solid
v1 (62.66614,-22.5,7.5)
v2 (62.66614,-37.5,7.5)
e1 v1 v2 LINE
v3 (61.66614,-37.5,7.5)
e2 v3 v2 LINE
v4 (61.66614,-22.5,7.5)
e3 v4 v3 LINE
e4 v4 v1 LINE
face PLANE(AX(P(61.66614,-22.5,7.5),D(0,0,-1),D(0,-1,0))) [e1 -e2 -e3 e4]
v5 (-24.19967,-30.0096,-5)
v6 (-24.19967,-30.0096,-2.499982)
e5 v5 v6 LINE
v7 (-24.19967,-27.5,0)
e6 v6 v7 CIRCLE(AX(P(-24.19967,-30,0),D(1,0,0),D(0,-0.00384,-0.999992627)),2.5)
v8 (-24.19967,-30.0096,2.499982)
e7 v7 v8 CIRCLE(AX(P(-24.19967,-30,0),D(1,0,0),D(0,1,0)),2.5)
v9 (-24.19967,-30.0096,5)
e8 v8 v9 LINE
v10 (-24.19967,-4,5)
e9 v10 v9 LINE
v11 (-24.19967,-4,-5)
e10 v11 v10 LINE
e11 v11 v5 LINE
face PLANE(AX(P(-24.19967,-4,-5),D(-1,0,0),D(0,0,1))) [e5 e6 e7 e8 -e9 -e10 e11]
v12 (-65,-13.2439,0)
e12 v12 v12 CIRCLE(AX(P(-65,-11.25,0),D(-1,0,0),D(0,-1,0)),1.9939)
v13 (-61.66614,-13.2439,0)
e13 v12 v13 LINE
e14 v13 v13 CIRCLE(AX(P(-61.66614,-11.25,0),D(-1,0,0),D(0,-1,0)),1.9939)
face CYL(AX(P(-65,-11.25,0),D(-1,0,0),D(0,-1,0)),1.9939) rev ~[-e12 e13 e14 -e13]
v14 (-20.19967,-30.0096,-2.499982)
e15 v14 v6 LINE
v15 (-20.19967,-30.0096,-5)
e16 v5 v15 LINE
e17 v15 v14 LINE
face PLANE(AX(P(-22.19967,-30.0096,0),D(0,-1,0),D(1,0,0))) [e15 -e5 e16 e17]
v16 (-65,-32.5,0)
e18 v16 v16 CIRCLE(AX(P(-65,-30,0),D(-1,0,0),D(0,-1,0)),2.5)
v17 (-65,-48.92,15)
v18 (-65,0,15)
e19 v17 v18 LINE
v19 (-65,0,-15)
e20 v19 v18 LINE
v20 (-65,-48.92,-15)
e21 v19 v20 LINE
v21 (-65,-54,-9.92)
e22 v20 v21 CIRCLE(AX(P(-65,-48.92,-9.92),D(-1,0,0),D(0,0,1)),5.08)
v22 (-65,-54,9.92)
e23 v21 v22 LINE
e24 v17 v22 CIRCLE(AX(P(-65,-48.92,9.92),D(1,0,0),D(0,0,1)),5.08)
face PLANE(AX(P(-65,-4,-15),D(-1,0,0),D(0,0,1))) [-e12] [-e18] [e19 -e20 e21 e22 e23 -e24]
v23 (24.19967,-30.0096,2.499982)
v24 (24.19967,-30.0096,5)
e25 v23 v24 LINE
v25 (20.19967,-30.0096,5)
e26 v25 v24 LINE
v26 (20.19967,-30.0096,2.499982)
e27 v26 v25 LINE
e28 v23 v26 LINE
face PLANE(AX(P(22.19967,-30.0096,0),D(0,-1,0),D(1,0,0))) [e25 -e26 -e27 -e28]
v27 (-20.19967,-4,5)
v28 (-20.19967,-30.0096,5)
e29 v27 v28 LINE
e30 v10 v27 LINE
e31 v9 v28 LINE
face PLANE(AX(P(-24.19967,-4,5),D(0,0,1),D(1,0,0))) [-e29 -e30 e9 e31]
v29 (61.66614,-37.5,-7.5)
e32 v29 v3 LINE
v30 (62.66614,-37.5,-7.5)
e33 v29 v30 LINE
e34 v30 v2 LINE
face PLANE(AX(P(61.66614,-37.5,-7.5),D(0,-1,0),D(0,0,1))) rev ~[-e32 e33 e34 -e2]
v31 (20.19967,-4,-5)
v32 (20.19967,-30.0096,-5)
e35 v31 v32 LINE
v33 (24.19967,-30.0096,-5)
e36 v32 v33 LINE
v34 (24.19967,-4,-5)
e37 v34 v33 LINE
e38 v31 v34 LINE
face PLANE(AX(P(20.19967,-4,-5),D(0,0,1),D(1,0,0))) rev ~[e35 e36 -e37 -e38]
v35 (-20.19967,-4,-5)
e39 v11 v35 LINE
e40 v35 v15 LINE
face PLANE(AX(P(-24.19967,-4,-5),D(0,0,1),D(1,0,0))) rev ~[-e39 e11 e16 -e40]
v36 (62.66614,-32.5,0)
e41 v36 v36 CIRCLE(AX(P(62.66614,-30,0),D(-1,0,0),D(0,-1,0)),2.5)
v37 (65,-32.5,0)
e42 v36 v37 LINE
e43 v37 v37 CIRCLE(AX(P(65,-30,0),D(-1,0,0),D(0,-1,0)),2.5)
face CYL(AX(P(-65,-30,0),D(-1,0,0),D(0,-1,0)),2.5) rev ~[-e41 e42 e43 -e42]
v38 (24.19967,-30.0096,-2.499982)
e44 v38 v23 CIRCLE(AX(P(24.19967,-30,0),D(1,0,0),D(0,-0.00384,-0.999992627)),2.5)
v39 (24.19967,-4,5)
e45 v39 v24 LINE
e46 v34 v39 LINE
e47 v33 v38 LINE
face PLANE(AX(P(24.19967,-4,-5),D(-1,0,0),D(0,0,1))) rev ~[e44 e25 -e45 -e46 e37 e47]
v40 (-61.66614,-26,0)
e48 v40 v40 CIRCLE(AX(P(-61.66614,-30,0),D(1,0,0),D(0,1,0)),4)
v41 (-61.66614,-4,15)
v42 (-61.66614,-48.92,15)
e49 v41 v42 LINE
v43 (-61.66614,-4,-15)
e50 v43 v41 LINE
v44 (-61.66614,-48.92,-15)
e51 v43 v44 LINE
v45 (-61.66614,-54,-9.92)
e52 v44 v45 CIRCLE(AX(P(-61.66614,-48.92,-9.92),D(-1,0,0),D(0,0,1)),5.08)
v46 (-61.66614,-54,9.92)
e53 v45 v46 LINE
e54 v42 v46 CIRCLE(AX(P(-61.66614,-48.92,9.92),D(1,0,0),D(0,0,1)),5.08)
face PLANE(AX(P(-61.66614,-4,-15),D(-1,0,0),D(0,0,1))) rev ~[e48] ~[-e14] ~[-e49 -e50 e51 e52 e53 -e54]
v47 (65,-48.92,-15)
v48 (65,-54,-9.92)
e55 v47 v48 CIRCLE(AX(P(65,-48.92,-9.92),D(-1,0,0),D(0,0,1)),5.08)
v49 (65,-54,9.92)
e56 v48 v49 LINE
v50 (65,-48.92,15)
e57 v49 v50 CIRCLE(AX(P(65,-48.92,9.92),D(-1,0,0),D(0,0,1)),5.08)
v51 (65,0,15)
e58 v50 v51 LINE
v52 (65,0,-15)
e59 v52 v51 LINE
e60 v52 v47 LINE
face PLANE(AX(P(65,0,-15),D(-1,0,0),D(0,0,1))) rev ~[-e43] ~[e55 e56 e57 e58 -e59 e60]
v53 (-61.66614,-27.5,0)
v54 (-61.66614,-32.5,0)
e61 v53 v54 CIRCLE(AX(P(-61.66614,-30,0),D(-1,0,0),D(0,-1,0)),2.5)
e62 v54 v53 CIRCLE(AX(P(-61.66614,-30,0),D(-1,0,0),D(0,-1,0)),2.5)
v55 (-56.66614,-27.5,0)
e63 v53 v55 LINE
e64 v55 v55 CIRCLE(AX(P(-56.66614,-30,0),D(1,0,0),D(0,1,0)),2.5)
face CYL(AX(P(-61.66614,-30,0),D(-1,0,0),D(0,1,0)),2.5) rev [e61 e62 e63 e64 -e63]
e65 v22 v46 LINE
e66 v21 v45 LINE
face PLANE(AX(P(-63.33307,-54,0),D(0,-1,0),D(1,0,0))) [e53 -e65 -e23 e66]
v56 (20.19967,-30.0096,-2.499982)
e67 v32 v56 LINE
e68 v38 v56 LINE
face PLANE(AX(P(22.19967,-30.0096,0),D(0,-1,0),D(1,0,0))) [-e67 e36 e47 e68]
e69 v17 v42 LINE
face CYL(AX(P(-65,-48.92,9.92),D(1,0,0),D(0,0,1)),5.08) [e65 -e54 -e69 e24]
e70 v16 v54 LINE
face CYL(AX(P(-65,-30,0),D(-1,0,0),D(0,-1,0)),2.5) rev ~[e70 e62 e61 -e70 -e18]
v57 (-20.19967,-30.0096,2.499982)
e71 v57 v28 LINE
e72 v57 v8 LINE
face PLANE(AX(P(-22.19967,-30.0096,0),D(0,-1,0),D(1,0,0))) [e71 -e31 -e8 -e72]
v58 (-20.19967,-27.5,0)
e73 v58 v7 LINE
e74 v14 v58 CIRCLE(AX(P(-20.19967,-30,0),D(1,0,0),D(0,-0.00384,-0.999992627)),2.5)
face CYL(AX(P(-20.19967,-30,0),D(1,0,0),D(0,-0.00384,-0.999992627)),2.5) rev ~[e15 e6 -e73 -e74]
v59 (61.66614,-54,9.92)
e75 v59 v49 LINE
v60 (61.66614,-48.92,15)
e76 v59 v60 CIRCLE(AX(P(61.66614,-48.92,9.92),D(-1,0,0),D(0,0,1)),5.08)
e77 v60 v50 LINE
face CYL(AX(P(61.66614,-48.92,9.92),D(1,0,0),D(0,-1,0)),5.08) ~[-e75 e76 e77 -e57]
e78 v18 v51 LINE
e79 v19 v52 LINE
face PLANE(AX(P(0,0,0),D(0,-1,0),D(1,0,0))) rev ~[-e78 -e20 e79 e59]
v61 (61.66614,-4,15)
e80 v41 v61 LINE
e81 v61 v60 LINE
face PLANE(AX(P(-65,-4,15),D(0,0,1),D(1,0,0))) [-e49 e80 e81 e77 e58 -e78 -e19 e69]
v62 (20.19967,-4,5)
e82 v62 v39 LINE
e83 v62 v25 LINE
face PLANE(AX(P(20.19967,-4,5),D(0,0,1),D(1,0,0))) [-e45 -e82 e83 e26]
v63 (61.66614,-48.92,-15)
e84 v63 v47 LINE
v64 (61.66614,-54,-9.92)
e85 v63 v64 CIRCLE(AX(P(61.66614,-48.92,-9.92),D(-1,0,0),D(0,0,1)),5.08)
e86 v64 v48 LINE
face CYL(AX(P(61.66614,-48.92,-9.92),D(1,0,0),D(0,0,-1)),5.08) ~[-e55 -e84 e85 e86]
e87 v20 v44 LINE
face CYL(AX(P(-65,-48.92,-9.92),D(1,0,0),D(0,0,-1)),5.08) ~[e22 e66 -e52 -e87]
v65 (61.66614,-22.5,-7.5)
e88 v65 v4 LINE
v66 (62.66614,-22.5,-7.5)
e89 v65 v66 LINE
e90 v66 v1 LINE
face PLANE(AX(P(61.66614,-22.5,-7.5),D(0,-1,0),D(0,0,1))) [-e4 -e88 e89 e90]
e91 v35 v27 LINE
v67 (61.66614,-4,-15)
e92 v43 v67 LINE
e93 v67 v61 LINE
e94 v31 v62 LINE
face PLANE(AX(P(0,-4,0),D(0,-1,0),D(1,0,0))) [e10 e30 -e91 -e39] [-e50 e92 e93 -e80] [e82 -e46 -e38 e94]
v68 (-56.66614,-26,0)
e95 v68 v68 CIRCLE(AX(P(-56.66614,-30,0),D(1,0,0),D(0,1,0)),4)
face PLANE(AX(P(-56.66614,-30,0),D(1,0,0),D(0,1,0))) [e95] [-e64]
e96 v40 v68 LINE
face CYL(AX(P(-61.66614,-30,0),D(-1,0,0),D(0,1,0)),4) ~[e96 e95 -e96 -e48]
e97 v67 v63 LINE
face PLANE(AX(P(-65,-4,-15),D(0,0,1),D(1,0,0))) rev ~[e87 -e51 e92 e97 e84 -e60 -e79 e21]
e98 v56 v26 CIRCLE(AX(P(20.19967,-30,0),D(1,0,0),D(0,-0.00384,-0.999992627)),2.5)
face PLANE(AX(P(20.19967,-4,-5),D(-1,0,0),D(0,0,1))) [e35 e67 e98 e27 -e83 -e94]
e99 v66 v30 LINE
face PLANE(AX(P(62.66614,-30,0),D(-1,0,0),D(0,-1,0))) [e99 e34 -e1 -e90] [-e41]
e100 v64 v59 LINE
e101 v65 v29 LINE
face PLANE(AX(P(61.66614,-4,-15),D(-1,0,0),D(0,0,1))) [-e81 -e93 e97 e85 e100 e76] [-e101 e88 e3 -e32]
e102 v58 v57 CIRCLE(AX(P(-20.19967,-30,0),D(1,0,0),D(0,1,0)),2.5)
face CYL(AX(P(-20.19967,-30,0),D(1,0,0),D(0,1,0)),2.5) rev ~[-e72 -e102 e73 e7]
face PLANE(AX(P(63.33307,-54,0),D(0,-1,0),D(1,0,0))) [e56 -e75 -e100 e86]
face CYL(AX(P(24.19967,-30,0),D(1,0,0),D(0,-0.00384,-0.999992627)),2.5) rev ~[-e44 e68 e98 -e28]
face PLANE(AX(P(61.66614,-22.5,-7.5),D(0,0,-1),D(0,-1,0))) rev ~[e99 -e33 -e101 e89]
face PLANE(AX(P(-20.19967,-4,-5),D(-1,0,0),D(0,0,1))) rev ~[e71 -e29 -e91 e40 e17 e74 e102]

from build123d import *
from build123d import SkipClean  # not in build123d's __all__

# Parameters (mm, degrees)
F0_W      = 130
F0_H      = 30
F1_DEPTH  = 4
F2_W      = 3.3338604867
F2_H      = 30
F3_DEPTH  = 50
F4_R      = 5.08
F5_R      = 2.5
F6_DEPTH  = 137.16
F7_R      = 4
F7_R_2    = 2.5
F8_DEPTH  = 5
F9_W      = 15
F9_H      = 15
F9_R      = 2.5
F10_DEPTH = 1
F11_W     = 4
F11_H     = 10
F12_DEPTH = 26.0096
F14_DEPTH = 14.224
F16_DEPTH = 6.096
F17_R     = 1.9939
F18_DEPTH = 25.4


# Not quite as in the source:
# - after a boolean that leaves OpenCascade's solid faulty, fix() repairs it
# - a feature names something its author has since deleted; it is built from what else it names


with BuildPart() as f1:
    # F0 (on Front) → F1 (new body)
    with BuildSketch(Plane.XZ):
        Rectangle(F0_W, F0_H)
    extrude(amount=F1_DEPTH)

    # F2 (on face) → F3 (join)
    with BuildSketch(Plane.XZ.offset(4)):
        with Locations((-63.3330697566, 0)):
            Rectangle(F2_W, F2_H)
        with Locations((63.3330697566, 0)):
            Rectangle(F2_W, F2_H)
    extrude(amount=F3_DEPTH)

    # F4
    f4_edges = [f1.edges().sort_by_distance(p)[0] for p in [
        (63.33307, -54, 15),
        (63.33307, -54, -15),
        (-63.33307, -54, -15),
        (-63.33307, -54, 15),
    ]]
    fillet(f4_edges, radius=F4_R)

    # F5 (on face) → F6 (cut)
    with BuildSketch(Plane(origin=(-65, 0, 0), x_dir=(0, -1, 0), z_dir=(-1, 0, 0))):
        with Locations((30, 0)):
            Circle(F5_R)
    extrude(amount=-F6_DEPTH, mode=Mode.SUBTRACT)

    # F7 (on face) → F8 (join)
    with BuildSketch(Plane.YZ.offset(-61.6661395133)):
        with Locations((-30, 0)):
            Circle(F7_R)
        with Locations((-30, 0)):
            Circle(F7_R_2, mode=Mode.SUBTRACT)
    with SkipClean():  # cleaning this boolean's faces spoils the solid; the shape is the same uncleaned
        extrude(amount=F8_DEPTH)

    # F9 (on face) → F10 (cut)
    with BuildSketch(Plane(origin=(61.6661395133, 0, 0), x_dir=(0, -1, 0), z_dir=(-1, 0, 0))):
        with Locations((30, 0)):
            Rectangle(F9_W, F9_H)
        with Locations((30, 0)):
            Circle(F9_R, mode=Mode.SUBTRACT)
    extrude(amount=-F10_DEPTH, mode=Mode.SUBTRACT)

    add(f1.part.fix(), mode=Mode.REPLACE)

    # F11 (on face) → F12 (join)
    with BuildSketch(Plane.XZ.offset(4)):
        with Locations((-22.1996698529, 0)):
            Rectangle(F11_W, F11_H)
        with Locations((22.1996698529, 0)):
            Rectangle(F11_W, F11_H)
    extrude(amount=F12_DEPTH)

    # F13 (on face) → F14 (cut)
    with BuildSketch(Plane.YZ.offset(-20.1996698529)):
        with BuildLine():
            ThreePointArc((-30.0096, -2.4999815679), (-28.2356304242, -1.7711578134), (-27.5, 0))
            ThreePointArc((-27.5, 0), (-28.2356304242, 1.7711578134), (-30.0096, 2.4999815679))
            Line((-30.0096, 2.4999815679), (-30.0096, -2.4999815679))
        make_face()
    extrude(amount=-F14_DEPTH, mode=Mode.SUBTRACT)

    # F15 (on face) → F16 (cut)
    with BuildSketch(Plane.YZ.offset(24.1996698529)):
        with BuildLine():
            Line((-30.0096, 2.4999815679), (-30.0096, -2.4999815679))
            ThreePointArc((-30.0096, -2.4999815679), (-27.5, 0), (-30.0096, 2.4999815679))
        make_face()
    extrude(amount=-F16_DEPTH, mode=Mode.SUBTRACT)

    # F17 (on face) → F18 (cut)
    with BuildSketch(Plane(origin=(-65, 0, 0), x_dir=(0, -1, 0), z_dir=(-1, 0, 0))):
        with Locations((11.25, 0)):
            Circle(F17_R)
    extrude(amount=-F18_DEPTH, mode=Mode.SUBTRACT)


solid = f1.part
